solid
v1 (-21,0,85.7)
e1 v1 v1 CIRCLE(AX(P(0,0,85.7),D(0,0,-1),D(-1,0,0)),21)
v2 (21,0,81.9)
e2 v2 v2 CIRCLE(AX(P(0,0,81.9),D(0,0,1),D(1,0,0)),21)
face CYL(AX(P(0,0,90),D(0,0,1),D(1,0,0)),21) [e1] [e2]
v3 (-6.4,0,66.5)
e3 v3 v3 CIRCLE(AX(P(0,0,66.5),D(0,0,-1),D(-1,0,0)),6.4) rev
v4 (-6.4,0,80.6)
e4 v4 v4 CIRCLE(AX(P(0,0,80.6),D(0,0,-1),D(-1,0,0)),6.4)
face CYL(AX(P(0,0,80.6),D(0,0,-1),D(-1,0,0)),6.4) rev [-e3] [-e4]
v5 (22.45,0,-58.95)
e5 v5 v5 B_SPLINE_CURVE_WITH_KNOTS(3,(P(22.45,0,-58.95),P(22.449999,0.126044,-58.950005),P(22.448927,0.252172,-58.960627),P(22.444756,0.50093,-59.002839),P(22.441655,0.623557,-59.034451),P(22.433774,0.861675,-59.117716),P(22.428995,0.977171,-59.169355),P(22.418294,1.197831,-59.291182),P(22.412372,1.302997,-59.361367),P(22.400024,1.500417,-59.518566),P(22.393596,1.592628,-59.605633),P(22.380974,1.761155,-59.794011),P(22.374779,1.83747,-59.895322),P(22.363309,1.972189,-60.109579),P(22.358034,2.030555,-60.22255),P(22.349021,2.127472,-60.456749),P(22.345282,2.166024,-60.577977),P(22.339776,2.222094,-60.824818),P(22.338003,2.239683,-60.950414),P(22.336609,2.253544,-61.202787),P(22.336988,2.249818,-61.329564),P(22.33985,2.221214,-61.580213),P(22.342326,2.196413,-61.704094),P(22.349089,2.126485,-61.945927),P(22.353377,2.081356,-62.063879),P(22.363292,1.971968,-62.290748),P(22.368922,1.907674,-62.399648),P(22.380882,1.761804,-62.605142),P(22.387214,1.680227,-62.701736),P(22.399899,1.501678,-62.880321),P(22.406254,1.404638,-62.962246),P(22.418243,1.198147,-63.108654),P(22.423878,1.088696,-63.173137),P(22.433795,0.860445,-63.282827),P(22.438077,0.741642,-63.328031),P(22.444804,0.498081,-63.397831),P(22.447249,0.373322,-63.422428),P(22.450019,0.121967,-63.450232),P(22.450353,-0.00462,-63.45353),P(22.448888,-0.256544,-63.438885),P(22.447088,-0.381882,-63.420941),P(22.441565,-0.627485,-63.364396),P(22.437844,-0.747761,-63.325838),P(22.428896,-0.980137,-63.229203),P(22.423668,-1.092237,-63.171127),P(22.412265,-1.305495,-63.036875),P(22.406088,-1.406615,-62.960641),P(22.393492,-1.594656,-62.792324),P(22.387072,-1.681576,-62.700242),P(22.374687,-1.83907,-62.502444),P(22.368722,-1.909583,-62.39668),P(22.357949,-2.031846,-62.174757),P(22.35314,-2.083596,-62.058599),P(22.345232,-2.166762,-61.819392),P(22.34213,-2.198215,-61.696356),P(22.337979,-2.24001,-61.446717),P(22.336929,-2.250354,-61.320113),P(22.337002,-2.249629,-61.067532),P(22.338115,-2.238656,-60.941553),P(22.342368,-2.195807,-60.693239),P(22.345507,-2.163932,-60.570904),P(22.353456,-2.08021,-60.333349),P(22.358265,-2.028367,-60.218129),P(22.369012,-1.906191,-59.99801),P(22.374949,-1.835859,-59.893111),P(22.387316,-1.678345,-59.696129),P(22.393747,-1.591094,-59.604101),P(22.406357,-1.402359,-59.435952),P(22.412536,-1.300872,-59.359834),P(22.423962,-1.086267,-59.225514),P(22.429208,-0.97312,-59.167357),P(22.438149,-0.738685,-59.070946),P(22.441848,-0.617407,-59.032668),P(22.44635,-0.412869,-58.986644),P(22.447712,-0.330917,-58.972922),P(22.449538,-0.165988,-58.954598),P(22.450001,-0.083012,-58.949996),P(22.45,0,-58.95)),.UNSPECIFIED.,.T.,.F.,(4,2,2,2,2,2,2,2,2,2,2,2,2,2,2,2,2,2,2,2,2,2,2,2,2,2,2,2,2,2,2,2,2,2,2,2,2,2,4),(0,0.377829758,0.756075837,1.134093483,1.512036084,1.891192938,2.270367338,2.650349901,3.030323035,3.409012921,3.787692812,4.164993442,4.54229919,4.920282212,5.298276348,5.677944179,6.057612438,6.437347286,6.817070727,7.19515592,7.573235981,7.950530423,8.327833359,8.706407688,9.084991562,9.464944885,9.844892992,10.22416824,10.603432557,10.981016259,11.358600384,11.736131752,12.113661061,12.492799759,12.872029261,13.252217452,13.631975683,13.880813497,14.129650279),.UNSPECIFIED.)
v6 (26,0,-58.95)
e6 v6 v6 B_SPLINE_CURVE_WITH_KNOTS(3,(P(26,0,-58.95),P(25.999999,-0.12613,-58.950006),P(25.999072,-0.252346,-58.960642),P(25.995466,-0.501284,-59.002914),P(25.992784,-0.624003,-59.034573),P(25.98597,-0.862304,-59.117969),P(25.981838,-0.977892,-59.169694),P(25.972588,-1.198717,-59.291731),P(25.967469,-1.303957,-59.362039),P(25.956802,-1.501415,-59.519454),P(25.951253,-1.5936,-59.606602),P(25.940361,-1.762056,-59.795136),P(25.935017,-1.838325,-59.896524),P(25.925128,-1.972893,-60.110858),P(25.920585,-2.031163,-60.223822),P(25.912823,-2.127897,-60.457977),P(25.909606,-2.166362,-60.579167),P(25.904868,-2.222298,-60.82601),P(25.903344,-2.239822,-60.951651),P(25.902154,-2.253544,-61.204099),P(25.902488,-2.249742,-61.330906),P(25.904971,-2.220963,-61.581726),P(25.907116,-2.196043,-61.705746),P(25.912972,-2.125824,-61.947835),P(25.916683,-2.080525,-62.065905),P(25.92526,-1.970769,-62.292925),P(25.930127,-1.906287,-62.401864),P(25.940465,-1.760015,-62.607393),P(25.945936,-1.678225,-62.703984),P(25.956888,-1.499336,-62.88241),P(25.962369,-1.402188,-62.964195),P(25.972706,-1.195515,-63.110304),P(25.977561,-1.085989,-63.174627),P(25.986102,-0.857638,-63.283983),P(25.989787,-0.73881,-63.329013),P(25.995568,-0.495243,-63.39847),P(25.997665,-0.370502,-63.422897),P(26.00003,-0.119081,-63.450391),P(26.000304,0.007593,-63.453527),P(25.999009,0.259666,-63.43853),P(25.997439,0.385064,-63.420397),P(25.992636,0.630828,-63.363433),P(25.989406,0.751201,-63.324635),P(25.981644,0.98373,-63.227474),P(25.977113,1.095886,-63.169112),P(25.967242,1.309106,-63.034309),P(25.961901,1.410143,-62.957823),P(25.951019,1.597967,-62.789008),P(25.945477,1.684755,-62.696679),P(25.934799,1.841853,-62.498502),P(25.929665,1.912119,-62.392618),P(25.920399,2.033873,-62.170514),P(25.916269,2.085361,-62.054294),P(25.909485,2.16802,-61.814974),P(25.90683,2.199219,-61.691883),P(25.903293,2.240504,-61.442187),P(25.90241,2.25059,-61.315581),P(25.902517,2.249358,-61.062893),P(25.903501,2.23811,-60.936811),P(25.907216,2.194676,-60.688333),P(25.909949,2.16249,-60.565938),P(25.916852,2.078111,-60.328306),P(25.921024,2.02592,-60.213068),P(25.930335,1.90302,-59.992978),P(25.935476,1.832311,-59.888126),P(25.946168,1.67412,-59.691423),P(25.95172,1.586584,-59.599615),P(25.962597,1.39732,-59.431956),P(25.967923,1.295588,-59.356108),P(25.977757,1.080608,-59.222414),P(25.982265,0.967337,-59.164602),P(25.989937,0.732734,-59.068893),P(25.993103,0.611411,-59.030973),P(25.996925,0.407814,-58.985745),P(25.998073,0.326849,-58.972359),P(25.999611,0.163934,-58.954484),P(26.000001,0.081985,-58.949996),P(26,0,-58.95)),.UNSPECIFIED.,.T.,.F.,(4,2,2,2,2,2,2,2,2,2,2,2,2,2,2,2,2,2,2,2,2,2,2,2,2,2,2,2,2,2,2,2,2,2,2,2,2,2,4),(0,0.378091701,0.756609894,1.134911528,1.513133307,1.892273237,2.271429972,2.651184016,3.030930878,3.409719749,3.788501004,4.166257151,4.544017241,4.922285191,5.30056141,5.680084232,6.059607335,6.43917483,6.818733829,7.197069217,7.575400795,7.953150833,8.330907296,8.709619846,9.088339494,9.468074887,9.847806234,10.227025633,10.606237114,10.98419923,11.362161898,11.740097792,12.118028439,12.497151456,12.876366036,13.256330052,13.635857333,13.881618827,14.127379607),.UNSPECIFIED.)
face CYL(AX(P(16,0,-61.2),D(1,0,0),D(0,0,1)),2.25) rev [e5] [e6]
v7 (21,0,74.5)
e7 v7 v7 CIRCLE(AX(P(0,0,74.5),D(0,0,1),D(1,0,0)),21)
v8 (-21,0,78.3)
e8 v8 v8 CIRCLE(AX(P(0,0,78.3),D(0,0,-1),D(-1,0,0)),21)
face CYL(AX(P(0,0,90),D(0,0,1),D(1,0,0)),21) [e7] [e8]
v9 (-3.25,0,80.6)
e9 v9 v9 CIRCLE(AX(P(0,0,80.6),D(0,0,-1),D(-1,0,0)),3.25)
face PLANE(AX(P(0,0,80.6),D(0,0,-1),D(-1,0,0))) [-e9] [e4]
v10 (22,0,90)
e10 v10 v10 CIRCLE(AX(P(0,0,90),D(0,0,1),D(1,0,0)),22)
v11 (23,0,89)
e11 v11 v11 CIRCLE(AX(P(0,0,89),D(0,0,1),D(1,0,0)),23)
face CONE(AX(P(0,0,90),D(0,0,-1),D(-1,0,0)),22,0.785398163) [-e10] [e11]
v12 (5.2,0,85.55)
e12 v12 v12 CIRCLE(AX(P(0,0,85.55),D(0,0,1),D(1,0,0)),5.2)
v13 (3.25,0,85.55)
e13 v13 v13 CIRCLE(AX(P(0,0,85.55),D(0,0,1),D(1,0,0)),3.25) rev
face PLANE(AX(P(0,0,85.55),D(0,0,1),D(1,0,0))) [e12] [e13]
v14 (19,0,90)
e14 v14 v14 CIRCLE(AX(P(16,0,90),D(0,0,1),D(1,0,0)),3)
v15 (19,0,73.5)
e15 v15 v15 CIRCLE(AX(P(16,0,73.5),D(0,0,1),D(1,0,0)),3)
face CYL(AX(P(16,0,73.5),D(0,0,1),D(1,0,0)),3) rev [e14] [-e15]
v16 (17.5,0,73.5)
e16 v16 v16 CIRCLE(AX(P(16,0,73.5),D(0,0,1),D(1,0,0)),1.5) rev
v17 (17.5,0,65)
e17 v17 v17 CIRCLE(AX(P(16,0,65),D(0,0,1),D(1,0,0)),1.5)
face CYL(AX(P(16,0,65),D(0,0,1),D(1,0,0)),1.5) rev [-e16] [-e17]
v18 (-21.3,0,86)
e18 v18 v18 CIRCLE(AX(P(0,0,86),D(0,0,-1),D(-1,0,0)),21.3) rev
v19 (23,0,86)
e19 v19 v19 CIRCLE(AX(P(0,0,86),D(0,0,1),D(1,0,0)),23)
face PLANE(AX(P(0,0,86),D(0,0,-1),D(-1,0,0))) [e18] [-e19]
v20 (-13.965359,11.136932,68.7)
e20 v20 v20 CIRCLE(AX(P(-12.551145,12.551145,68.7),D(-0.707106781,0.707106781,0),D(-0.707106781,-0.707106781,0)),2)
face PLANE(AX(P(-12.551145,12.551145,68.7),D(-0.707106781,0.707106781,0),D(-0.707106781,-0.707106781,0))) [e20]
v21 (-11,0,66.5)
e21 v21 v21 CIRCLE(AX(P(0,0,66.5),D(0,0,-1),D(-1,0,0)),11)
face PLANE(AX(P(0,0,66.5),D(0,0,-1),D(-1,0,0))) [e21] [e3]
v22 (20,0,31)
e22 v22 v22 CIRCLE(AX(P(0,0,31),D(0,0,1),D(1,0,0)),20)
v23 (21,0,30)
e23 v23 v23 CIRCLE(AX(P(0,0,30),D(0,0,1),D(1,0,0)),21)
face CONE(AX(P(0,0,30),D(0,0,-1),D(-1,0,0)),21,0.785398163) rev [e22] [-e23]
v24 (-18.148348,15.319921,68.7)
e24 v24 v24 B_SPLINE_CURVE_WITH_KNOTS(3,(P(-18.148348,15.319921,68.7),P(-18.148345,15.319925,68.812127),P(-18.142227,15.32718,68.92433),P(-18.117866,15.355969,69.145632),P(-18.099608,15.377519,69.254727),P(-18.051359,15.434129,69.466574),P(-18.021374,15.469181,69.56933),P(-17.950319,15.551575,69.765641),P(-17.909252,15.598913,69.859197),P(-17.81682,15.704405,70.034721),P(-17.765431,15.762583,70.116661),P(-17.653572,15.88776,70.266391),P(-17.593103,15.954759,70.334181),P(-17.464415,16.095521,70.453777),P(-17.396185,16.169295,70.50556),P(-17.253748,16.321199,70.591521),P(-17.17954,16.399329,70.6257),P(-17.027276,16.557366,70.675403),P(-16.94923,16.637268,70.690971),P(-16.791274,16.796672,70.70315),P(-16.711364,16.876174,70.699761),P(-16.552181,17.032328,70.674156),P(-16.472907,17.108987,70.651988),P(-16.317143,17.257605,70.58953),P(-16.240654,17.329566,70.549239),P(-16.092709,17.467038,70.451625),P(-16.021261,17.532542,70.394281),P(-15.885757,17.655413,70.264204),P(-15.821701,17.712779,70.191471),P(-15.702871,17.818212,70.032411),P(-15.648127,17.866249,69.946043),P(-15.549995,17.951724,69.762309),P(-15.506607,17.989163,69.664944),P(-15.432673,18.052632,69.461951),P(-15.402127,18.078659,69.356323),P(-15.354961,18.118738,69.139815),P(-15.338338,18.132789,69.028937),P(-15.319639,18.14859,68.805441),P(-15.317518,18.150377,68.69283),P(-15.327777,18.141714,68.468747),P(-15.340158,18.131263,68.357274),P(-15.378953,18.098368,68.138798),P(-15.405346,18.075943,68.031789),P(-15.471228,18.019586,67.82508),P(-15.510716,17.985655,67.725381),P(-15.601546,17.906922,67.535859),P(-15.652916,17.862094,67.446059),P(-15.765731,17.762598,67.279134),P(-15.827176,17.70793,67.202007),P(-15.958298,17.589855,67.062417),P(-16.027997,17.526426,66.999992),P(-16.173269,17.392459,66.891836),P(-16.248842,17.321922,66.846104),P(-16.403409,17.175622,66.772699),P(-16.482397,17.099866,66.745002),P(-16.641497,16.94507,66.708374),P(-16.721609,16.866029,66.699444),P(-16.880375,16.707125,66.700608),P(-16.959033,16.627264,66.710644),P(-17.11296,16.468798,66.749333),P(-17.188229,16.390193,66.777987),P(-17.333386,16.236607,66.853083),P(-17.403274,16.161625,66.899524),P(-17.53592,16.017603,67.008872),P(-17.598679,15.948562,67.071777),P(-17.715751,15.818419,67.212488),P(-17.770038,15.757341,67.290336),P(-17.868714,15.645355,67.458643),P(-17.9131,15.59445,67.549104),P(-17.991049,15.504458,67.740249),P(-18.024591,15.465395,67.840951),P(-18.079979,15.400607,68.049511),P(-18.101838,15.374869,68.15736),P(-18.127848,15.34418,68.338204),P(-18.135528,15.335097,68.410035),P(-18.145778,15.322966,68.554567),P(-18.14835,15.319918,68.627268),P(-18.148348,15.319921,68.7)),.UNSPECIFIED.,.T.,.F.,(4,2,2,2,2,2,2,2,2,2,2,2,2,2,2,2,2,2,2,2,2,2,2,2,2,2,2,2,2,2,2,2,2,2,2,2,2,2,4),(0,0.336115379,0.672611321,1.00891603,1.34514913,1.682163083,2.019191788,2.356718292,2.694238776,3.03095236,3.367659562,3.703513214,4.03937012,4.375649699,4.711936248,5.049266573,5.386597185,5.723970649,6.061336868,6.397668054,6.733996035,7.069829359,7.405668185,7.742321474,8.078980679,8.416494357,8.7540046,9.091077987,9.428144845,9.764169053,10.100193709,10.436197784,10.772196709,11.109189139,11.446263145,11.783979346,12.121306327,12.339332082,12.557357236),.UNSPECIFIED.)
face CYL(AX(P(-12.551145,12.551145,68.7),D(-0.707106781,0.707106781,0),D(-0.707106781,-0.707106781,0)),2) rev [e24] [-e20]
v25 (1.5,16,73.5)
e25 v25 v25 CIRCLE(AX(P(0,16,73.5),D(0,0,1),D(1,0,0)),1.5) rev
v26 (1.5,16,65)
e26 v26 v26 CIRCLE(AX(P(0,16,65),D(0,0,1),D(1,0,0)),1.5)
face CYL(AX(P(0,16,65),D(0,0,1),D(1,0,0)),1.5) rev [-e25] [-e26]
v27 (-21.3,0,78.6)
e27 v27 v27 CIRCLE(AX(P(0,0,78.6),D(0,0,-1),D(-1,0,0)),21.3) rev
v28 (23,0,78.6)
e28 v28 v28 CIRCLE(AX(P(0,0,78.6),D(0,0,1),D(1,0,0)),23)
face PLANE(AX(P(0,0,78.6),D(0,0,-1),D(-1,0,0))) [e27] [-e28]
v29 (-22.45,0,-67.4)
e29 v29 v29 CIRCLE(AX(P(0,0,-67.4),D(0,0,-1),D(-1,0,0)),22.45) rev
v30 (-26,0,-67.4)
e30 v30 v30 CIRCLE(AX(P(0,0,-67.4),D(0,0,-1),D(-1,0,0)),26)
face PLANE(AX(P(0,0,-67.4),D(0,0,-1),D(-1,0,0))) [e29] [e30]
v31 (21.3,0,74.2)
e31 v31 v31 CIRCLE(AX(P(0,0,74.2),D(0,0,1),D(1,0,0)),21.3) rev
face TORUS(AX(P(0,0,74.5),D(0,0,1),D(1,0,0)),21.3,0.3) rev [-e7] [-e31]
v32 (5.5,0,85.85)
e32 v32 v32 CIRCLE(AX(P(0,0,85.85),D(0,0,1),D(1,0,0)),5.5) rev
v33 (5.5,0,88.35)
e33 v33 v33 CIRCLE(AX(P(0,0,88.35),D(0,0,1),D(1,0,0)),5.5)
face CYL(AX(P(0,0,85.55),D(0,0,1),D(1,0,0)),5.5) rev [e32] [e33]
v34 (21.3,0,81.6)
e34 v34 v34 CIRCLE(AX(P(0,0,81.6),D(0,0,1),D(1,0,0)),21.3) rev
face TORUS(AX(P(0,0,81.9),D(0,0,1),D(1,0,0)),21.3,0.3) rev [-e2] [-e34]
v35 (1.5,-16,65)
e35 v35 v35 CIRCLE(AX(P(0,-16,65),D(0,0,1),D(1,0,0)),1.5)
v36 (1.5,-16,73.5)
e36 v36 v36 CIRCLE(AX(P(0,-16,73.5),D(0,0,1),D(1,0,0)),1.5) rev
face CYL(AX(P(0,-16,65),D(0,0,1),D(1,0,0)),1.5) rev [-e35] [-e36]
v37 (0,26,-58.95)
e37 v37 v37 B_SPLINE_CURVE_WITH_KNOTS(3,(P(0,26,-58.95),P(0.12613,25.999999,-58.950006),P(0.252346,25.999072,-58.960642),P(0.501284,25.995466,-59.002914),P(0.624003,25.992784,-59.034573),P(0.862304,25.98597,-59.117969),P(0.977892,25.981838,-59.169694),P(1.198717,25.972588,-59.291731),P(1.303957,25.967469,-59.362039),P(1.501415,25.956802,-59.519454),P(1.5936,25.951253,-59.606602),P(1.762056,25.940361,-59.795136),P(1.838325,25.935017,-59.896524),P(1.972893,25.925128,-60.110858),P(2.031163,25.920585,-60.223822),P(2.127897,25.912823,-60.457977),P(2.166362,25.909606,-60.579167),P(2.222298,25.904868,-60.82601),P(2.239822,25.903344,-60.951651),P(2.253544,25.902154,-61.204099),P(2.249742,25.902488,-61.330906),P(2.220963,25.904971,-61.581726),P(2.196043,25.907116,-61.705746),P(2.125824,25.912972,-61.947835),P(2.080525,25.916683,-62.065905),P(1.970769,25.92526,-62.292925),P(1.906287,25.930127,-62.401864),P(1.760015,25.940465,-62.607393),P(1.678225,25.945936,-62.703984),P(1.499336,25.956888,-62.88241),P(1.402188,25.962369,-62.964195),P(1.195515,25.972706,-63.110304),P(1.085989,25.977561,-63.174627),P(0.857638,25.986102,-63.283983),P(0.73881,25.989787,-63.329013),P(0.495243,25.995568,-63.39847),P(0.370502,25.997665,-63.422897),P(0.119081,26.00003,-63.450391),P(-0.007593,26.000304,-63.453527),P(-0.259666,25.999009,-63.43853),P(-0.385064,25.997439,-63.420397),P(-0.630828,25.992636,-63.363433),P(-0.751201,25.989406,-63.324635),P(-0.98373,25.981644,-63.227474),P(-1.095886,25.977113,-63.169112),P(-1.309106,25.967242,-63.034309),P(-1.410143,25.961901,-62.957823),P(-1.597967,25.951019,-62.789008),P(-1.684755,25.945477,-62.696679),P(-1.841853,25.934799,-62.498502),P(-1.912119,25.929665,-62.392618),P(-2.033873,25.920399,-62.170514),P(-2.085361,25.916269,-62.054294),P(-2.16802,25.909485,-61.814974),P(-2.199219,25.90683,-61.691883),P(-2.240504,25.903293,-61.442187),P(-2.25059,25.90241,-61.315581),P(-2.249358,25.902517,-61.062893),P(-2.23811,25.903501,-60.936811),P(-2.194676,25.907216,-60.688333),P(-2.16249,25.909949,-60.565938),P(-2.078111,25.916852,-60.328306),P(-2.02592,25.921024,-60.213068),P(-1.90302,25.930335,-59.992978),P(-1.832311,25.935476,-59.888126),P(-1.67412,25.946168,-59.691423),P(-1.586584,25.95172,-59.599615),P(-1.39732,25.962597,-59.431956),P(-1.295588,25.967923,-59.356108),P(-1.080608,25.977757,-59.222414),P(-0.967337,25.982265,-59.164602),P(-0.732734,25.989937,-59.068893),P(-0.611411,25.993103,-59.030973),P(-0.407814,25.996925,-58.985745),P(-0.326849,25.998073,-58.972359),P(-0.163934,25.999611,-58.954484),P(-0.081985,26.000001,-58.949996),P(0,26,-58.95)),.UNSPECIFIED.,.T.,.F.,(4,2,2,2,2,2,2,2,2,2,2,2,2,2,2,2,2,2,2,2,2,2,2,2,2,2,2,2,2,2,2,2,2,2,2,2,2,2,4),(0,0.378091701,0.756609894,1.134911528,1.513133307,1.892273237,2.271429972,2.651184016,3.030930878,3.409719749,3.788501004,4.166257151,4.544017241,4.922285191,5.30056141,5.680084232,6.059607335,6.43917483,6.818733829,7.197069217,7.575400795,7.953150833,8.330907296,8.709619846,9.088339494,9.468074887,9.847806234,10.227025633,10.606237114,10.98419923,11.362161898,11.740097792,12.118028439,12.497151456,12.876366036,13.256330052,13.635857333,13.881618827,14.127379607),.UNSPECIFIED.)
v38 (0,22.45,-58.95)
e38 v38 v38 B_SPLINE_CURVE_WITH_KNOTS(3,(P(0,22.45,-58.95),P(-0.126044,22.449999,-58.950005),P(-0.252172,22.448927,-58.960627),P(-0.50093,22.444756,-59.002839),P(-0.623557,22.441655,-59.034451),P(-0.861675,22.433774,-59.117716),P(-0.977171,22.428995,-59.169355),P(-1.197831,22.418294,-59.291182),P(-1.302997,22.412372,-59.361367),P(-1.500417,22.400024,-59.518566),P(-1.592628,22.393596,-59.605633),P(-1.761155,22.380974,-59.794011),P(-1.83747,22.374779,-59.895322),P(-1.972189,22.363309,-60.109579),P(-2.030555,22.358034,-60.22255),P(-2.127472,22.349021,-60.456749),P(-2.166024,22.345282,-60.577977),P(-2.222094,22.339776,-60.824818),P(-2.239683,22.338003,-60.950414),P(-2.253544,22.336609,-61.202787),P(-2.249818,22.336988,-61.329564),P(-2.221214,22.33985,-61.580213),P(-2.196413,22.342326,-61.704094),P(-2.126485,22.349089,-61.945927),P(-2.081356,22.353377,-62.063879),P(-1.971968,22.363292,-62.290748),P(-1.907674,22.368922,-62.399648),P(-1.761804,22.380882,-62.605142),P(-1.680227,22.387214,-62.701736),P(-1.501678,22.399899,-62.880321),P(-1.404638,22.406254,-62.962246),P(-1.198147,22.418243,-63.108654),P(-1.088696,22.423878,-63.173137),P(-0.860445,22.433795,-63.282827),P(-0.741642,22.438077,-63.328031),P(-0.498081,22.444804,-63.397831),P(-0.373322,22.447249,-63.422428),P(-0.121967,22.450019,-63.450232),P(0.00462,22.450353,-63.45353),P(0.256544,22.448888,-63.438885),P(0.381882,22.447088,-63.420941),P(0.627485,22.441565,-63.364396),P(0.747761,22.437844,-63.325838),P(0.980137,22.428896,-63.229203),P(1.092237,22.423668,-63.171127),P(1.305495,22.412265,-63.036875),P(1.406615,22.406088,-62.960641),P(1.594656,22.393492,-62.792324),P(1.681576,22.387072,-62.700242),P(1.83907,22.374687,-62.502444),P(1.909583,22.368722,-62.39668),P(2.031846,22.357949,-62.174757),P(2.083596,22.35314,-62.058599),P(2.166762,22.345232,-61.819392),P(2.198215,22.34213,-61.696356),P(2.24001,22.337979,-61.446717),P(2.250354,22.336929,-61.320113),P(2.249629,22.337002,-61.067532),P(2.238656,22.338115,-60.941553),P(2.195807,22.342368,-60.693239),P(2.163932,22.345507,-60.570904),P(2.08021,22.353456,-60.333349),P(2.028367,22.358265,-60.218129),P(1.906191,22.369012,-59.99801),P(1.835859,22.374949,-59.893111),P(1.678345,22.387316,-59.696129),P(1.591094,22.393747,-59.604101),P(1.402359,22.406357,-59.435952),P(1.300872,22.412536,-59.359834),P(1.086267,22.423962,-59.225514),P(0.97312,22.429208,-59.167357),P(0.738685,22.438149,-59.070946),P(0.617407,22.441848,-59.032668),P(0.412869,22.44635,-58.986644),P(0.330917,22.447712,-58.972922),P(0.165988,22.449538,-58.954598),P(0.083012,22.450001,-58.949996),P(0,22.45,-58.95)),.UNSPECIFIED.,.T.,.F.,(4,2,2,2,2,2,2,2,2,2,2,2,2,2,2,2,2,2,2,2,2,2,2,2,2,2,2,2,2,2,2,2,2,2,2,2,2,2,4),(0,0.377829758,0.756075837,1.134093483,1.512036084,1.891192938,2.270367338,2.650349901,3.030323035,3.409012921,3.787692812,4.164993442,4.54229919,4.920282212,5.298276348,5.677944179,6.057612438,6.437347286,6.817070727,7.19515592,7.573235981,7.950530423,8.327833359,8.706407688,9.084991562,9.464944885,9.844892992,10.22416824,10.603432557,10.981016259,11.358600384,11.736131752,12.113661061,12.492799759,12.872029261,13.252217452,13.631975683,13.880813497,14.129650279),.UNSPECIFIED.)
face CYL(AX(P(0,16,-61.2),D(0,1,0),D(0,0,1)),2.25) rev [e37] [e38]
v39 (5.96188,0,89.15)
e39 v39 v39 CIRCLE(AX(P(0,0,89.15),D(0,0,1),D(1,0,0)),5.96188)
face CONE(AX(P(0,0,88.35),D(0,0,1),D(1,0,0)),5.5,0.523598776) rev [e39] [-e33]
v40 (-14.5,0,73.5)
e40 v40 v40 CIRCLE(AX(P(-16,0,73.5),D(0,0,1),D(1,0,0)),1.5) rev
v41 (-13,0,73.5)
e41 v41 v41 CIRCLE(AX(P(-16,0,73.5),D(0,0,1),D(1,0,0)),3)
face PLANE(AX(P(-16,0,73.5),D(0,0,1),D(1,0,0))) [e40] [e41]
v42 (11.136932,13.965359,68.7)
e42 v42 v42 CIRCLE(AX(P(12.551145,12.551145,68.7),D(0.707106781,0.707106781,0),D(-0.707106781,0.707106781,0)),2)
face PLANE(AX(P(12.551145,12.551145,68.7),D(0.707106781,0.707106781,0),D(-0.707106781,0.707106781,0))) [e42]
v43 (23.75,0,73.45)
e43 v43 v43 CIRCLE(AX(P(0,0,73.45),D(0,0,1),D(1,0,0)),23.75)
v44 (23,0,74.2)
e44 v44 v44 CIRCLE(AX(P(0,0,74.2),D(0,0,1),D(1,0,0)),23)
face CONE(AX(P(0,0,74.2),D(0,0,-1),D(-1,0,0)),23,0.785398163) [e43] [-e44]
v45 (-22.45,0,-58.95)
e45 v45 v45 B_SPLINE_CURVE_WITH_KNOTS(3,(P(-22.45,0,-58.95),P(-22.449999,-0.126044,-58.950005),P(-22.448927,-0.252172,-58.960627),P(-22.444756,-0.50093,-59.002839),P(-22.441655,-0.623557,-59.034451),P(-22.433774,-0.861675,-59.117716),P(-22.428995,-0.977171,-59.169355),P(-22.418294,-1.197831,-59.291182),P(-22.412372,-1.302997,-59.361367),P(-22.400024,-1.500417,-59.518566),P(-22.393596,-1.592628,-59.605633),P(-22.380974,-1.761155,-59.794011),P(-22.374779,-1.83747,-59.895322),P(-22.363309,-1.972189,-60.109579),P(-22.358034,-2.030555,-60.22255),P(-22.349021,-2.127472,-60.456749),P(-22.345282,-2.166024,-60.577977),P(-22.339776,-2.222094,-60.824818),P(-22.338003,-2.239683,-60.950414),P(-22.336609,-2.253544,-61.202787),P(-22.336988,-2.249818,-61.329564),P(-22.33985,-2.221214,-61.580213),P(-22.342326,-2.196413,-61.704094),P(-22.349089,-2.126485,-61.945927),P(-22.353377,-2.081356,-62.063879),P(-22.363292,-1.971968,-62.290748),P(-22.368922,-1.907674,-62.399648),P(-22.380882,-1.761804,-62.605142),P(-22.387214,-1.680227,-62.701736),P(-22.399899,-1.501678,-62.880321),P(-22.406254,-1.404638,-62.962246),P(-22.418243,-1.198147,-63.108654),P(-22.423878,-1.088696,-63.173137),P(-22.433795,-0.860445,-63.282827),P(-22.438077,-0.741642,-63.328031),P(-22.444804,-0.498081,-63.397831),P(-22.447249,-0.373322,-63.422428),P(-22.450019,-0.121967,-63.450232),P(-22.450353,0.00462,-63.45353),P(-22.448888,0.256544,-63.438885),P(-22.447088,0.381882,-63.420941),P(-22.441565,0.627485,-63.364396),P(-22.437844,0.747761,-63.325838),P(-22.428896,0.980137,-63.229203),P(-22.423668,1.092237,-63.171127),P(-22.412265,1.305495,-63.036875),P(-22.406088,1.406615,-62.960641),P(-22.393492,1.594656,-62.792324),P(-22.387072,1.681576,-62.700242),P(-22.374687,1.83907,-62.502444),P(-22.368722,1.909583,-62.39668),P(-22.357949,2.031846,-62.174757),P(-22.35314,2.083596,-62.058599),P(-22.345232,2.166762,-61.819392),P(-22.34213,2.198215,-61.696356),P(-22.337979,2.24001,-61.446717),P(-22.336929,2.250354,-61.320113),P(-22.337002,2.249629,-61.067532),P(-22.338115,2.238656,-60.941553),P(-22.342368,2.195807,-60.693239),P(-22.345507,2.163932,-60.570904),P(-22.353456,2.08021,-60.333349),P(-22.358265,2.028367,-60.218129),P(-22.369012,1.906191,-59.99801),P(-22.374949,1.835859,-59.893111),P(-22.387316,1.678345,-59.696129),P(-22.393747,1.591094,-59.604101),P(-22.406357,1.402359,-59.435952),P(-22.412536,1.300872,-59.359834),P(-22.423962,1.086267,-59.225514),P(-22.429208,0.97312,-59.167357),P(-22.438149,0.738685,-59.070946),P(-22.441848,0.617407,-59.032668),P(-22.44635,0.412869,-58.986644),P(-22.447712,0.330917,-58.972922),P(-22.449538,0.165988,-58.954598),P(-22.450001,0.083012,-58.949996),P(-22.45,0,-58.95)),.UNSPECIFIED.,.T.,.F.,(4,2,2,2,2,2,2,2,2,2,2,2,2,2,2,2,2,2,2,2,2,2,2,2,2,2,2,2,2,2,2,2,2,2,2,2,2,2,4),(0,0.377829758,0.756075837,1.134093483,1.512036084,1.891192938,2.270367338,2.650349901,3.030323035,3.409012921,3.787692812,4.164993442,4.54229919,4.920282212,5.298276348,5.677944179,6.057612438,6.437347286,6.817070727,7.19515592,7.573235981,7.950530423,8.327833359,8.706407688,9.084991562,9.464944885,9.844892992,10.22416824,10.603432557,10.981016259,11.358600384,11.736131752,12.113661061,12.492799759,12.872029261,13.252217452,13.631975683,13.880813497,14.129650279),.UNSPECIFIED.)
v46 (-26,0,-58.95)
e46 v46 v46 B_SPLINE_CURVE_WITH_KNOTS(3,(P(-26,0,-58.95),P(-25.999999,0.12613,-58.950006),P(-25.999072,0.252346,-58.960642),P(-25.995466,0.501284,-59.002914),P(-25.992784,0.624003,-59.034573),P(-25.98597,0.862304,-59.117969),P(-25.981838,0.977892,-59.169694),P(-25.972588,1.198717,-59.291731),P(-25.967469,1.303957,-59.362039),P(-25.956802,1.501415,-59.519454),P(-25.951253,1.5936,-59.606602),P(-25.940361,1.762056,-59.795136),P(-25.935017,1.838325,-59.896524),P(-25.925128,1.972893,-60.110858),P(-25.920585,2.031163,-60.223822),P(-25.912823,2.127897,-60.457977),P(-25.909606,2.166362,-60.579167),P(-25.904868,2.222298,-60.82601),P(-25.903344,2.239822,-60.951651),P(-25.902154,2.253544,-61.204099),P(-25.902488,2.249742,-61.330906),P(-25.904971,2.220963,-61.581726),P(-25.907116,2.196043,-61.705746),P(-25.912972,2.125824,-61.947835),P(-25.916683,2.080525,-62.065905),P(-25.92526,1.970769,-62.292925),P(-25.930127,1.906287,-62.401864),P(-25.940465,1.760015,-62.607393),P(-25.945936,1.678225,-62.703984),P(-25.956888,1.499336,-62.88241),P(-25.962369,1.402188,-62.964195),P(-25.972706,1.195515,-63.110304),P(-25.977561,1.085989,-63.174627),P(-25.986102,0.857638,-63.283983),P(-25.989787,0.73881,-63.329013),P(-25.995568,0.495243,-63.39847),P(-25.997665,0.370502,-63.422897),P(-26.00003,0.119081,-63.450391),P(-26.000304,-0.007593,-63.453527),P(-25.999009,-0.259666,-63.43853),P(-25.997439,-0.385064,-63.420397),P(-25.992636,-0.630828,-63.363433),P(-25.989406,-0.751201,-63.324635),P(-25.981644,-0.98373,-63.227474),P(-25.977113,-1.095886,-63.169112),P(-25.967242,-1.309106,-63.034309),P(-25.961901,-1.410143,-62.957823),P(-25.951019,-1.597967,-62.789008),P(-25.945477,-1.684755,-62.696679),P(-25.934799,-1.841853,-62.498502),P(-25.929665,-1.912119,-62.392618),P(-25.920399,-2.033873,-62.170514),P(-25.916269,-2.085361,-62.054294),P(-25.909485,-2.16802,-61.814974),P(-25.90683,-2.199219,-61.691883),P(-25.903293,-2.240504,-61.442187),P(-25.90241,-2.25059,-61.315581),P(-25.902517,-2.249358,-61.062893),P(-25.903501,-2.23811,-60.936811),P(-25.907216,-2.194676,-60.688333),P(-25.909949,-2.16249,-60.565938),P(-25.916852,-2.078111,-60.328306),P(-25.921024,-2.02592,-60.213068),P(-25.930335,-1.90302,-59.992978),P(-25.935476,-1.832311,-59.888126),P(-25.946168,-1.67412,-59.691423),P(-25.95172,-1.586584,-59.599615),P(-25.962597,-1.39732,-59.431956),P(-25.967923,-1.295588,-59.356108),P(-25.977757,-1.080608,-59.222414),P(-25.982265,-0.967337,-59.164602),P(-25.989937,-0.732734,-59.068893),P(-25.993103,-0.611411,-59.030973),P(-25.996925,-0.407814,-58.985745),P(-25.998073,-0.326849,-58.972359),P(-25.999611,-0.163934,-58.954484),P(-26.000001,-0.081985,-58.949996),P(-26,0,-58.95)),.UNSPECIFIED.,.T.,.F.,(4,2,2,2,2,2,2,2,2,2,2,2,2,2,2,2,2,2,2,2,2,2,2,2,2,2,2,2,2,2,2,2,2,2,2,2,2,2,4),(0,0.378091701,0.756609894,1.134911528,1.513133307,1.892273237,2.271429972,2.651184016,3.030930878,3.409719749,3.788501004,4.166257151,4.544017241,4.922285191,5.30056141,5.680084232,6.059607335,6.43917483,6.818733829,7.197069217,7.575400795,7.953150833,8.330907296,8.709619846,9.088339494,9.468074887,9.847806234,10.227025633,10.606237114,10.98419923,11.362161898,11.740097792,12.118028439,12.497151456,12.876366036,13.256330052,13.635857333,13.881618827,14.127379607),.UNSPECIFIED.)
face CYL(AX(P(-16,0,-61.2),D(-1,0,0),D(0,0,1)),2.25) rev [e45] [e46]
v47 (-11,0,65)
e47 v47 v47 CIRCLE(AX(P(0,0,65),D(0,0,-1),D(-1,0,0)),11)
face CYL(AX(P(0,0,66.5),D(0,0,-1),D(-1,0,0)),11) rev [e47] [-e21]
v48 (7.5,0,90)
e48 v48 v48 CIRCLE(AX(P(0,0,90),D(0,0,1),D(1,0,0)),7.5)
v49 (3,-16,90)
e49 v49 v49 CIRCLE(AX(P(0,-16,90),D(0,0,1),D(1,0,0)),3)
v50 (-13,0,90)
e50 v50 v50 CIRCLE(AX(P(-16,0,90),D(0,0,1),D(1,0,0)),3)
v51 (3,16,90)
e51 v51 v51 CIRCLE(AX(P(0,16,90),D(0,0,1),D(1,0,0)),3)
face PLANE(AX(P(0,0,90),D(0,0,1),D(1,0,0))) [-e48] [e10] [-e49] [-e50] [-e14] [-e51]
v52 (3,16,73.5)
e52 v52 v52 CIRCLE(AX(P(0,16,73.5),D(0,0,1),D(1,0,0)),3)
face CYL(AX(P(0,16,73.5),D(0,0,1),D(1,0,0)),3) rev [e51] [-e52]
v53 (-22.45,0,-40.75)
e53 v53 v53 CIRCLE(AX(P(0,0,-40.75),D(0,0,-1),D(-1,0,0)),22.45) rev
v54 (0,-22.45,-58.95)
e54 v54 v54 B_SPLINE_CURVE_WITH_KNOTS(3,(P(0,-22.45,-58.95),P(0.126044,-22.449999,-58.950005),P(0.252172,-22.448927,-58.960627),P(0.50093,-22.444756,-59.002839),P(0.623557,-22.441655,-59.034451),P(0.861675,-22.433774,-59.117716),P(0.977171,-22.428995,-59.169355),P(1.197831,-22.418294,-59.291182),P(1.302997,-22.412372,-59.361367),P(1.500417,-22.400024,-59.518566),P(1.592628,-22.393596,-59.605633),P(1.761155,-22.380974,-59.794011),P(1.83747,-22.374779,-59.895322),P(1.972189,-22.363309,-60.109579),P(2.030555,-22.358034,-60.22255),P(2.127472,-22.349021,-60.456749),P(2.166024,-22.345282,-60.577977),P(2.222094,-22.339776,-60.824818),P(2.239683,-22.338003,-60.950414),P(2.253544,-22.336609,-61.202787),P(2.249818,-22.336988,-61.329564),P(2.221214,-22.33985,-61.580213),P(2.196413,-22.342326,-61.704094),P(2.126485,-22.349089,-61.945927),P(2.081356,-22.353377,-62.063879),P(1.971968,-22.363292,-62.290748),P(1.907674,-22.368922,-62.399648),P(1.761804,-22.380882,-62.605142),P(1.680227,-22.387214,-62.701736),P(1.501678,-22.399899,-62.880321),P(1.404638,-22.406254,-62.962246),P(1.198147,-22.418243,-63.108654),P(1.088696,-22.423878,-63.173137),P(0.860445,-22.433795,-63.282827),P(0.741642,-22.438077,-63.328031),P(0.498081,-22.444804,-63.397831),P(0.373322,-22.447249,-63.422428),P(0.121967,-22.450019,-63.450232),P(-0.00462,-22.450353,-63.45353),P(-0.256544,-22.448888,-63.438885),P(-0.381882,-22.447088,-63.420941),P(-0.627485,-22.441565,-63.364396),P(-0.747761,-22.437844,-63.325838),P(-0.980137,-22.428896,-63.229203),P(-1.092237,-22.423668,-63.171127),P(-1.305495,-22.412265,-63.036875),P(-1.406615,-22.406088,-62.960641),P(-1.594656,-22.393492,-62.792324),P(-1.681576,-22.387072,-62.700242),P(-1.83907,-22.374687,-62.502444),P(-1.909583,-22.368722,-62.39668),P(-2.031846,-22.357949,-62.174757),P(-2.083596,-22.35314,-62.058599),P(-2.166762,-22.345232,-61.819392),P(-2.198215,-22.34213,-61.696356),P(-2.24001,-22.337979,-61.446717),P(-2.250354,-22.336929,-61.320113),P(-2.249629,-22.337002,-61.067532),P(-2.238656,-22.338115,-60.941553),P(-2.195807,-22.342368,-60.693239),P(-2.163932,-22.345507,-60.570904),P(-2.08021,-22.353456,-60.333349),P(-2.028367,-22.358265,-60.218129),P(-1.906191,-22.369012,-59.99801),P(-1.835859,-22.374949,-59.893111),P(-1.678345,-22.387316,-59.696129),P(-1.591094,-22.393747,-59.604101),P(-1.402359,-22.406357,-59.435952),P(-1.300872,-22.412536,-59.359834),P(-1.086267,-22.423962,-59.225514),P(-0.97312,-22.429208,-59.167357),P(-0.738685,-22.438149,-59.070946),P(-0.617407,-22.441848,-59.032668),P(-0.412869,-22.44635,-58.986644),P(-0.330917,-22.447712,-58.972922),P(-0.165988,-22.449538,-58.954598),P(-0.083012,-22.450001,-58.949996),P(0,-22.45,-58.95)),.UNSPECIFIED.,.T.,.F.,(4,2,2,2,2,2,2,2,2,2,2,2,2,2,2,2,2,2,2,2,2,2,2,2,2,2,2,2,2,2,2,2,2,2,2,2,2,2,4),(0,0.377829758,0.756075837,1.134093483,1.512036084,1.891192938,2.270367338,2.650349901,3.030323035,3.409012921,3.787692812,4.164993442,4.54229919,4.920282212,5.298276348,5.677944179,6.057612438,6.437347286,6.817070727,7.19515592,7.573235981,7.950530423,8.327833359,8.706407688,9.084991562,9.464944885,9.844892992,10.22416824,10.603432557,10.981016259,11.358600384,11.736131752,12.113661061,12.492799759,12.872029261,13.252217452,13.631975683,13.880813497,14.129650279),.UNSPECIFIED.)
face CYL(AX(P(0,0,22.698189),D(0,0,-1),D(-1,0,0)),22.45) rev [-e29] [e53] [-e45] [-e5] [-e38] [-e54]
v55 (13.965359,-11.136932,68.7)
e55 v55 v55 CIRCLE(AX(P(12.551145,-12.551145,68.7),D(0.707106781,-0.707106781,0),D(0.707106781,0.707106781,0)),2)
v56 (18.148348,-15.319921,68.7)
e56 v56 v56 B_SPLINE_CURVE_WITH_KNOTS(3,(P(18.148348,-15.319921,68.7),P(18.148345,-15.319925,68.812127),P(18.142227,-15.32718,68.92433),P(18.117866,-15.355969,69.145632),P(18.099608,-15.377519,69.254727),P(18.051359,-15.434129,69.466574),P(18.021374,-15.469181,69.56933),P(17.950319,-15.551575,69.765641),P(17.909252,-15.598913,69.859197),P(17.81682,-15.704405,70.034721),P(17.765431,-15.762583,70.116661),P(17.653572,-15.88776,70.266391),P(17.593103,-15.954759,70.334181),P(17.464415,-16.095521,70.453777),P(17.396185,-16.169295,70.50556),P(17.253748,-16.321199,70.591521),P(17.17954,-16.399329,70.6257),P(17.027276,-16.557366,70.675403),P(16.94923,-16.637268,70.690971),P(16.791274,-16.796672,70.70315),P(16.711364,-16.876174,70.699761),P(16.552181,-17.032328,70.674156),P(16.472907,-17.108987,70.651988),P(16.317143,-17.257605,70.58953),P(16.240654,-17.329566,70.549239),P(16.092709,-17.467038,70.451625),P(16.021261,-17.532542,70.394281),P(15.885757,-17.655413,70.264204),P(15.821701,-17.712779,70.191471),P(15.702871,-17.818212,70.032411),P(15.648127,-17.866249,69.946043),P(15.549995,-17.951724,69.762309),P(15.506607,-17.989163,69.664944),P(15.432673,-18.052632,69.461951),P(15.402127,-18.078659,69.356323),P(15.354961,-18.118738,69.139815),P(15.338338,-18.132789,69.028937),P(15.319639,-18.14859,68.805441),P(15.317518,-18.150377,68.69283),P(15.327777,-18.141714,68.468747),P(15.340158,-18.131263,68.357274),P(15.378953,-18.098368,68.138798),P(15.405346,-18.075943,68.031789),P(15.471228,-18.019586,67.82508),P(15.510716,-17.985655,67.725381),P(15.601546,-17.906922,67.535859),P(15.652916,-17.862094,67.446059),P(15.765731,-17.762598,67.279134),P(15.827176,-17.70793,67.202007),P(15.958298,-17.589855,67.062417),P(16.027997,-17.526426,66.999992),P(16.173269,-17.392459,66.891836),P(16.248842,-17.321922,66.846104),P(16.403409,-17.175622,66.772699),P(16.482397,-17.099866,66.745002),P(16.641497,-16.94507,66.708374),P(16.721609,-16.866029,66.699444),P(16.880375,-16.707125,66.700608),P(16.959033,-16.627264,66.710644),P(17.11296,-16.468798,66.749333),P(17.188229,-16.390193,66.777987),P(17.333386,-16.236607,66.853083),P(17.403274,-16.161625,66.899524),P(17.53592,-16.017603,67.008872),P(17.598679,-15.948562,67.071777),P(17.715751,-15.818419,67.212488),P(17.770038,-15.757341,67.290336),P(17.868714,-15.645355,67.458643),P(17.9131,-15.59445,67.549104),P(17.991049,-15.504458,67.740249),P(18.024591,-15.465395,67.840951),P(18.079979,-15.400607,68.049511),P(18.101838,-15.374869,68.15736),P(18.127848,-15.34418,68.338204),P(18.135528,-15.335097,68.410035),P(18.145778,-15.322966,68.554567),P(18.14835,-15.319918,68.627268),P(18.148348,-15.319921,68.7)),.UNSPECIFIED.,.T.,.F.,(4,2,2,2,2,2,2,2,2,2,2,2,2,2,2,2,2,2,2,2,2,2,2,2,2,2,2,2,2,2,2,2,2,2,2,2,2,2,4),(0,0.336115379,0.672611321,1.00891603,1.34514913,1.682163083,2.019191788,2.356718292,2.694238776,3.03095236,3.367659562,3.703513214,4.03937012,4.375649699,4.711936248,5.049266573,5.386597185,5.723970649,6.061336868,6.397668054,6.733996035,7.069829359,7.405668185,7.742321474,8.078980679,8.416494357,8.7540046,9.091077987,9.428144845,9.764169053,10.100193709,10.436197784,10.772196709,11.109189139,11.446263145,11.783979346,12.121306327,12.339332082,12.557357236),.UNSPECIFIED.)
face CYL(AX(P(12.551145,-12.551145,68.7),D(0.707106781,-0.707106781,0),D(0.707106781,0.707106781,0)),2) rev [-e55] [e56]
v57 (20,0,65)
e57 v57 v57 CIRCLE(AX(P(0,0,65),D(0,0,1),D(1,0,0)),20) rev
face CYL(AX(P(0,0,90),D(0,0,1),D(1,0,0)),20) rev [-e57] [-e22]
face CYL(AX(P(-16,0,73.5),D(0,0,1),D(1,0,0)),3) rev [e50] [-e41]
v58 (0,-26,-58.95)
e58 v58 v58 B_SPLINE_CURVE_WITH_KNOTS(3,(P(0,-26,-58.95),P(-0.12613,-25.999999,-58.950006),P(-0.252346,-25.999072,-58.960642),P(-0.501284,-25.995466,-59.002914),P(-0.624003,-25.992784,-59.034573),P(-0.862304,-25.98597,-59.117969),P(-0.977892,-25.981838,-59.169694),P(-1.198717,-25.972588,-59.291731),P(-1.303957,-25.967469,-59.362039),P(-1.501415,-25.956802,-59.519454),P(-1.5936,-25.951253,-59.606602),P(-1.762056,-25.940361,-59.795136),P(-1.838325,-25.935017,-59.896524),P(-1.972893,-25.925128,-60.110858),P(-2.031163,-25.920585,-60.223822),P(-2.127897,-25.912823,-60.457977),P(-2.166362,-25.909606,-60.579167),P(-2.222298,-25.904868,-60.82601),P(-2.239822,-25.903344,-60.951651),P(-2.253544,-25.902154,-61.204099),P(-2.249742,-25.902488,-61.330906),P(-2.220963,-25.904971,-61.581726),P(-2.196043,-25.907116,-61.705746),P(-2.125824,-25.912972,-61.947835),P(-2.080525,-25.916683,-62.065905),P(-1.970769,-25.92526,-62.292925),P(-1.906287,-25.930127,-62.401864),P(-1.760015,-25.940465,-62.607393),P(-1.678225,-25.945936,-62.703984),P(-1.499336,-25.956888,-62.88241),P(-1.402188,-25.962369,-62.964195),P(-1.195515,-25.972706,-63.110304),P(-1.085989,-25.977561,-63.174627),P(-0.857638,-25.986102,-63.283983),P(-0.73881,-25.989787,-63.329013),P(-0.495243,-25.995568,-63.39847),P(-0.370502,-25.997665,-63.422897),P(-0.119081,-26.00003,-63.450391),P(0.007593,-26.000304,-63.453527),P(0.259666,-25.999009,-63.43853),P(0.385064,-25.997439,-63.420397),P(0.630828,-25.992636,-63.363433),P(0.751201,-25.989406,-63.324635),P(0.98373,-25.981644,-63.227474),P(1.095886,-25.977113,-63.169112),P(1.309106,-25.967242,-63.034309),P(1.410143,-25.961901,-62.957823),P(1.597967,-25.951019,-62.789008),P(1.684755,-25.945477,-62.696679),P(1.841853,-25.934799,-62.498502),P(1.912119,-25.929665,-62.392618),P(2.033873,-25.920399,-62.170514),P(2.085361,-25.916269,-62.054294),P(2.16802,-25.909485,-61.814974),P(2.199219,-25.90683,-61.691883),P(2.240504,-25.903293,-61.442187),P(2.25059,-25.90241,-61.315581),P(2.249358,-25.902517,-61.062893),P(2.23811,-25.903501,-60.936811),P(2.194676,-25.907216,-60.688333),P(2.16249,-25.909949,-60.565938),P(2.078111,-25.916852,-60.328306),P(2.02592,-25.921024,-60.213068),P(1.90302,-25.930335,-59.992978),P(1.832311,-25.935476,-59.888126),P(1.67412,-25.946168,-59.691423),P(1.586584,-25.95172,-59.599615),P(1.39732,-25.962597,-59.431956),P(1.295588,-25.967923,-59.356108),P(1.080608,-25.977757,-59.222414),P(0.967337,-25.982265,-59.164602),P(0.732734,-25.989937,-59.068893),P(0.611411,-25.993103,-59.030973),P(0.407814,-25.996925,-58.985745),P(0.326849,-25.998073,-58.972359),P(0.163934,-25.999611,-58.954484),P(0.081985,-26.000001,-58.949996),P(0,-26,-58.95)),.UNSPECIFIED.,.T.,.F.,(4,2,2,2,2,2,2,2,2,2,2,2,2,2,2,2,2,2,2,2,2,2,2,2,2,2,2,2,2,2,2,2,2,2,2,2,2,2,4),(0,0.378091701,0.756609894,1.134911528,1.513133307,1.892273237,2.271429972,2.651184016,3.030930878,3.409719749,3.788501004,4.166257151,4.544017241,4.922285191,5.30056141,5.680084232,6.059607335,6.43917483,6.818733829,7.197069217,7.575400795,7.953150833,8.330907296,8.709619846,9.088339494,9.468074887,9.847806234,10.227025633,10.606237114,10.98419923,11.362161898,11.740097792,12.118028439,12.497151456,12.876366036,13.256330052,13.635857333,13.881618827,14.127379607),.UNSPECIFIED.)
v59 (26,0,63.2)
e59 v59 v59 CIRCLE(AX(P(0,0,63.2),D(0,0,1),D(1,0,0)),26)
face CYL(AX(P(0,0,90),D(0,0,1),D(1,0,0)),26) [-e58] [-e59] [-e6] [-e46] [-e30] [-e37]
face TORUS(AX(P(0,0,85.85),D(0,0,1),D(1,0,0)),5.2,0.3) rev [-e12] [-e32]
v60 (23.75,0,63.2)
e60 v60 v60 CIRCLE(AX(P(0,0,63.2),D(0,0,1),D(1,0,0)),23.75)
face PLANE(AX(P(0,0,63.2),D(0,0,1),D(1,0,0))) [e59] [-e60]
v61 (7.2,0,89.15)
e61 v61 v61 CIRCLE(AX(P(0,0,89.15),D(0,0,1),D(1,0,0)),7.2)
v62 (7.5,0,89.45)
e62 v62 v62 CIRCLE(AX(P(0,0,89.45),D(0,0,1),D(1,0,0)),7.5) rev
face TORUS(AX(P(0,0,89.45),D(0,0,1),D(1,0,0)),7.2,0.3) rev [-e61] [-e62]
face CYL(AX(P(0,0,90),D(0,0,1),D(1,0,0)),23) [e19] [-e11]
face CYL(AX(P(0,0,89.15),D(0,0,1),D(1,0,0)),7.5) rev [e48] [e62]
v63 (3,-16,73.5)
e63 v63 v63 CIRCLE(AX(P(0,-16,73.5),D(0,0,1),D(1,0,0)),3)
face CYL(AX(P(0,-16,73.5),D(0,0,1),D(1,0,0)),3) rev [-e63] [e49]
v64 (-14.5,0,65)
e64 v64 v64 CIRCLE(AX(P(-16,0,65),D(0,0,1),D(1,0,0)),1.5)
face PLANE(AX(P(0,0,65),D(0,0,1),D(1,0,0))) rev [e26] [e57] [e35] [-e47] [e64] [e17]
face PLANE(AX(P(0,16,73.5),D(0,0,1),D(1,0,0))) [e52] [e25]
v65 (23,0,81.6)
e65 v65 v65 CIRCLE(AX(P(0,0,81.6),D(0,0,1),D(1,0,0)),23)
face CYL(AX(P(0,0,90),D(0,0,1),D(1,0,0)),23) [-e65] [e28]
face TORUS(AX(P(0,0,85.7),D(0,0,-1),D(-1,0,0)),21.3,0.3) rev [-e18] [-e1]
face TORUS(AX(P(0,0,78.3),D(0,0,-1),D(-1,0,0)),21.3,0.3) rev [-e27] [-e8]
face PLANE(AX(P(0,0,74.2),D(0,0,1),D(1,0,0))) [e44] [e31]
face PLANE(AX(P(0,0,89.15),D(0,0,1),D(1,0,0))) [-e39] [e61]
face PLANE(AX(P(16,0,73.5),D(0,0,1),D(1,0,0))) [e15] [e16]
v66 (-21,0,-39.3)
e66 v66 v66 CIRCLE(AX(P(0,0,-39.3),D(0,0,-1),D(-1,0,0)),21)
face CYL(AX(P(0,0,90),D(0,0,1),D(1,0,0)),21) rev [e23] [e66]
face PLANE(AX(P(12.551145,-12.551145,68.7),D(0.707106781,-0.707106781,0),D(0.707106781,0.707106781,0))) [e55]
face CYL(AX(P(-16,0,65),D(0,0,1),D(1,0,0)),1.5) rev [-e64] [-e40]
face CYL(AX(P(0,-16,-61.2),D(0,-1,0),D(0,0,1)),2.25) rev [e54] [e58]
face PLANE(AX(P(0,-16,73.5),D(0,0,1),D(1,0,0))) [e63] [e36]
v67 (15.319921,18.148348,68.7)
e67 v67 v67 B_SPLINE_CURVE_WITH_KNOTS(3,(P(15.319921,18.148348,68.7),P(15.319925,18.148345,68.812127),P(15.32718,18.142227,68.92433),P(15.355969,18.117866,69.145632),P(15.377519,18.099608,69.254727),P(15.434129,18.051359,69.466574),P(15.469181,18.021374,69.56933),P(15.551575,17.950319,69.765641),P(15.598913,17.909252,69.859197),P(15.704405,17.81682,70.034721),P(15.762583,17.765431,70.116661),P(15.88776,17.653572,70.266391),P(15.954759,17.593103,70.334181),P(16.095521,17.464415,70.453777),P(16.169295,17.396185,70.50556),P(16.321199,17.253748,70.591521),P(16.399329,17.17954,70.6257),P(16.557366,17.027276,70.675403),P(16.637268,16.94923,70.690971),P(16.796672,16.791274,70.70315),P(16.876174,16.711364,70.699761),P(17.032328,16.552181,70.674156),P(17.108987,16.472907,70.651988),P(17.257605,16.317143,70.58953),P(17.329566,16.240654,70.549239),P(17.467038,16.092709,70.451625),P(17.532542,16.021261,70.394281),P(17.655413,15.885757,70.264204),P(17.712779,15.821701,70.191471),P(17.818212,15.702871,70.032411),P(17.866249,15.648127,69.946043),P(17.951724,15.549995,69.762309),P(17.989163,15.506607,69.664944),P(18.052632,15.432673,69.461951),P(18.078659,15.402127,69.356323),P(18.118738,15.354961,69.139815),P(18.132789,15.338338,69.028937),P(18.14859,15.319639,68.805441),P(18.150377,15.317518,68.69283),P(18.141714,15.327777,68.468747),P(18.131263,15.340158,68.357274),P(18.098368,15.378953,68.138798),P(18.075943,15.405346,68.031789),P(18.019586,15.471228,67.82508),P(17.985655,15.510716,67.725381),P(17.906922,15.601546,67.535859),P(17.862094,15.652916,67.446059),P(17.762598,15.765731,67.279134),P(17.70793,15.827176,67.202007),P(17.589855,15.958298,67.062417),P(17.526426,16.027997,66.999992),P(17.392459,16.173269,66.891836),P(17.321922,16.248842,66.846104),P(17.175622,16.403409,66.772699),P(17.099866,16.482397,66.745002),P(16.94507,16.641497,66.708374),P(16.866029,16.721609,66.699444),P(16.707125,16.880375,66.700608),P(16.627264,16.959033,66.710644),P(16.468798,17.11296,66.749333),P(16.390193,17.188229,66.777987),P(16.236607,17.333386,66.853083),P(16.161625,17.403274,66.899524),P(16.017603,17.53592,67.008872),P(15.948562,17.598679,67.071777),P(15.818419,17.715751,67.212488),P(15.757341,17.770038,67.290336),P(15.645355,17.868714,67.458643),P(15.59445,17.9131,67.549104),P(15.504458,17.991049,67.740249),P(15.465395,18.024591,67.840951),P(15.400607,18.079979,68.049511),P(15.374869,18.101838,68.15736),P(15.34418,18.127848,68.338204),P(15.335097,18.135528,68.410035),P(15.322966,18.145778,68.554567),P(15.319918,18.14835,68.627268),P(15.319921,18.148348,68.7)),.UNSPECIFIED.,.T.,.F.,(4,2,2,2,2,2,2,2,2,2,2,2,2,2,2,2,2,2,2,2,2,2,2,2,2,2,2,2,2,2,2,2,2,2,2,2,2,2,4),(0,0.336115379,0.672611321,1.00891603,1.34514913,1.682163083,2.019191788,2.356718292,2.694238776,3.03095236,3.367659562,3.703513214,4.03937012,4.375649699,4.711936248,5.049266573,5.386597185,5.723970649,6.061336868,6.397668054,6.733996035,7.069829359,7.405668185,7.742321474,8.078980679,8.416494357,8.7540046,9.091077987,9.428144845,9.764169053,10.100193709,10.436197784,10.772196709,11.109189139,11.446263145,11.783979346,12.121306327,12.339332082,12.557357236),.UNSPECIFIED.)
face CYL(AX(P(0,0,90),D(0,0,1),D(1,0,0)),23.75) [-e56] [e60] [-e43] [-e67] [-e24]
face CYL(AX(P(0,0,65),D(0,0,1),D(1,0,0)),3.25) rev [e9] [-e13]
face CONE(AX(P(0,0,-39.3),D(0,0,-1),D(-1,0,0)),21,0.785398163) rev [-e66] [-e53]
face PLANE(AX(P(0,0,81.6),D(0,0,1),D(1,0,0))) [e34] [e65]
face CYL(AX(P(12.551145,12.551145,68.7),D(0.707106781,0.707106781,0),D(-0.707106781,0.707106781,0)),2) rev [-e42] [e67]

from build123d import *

# Parameters (mm, degrees)
BOSS_EXTRUDE2_START = -25
SKETCH18_R          = 20
SKETCH18_R_2        = 1.5
BOSS_EXTRUDE2_DEPTH = 25
SKETCH35_R          = 6.4
CUT_EXTRUDE11_DEPTH = 15.6
SKETCH25_R          = 3
CUT_EXTRUDE3_DEPTH  = 16.5
SKETCH23_R          = 11
CUT_EXTRUDE2_DEPTH  = 1.5
SKETCH24_R          = 3.25
CUT_EXTRUDE12_DEPTH = 25
SKETCH26_R          = 26
SKETCH26_R_2        = 21
BOSS_EXTRUDE4_DEPTH = 67.6
CUT_EXTRUDE4_START  = -26.8
SKETCH27_R          = 22.25
SKETCH27_R_2        = 21
CUT_EXTRUDE4_DEPTH  = 26.8
SKETCH32_R          = 2
CUT_EXTRUDE8_DEPTH  = 6
CIRPATTERN2_COUNT   = 3
CIRPATTERN2_ANGLE   = 180
SKETCH38_R          = 2.25
CUT_EXTRUDE14_DEPTH = 10
CIRPATTERN3_COUNT   = 4
SKETCH39_R          = 5.5
CUT_EXTRUDE15_DEPTH = 4.45
SKETCH40_R          = 7.5
CUT_EXTRUDE16_DEPTH = 0.85
SKETCH45_R          = 22.45
CUT_EXTRUDE20_DEPTH = 26.8
CUT_EXTRUDE21_START = -0.2
SKETCH46_R          = 26
CUT_EXTRUDE21_DEPTH = 0.2
CHAMFER4_SIZE       = 1.5
FILLET1_R           = 0.3
FILLET2_R           = 0.3


with BuildPart() as part:
    # Sketch8 → Revolve1 (revolve)
    with BuildSketch(Plane(origin=(0, 0, 0), x_dir=(0, 0, -1), z_dir=(1, 0, 0)), mode=Mode.PRIVATE) as revolve1_sk:
        Polygon((-90, 20), (-31, 20), (-30, 21), (0, 21), (0, 26), (-63.2, 26), (-63.2, 23.75), (-73.45, 23.75), (-74.2, 23), (-74.2, 21), (-78.6, 21), (-78.6, 23), (-81.6, 23), (-81.6, 21), (-86, 21), (-86, 23), (-89, 23), (-90, 22), align=None)
    revolve(revolve1_sk.sketch.rotate(Axis((0, 0, 90), (0, 0, -1)), 90), axis=Axis((0, 0, 90), (0, 0, -1)))

    # Sketch18 → Boss-Extrude2 (add)
    with BuildSketch(Plane.XY.offset(90).offset(BOSS_EXTRUDE2_START)):
        Circle(SKETCH18_R)
        with Locations((0, 16)):
            Circle(SKETCH18_R_2, mode=Mode.SUBTRACT)
        with Locations((16, 0)):
            Circle(SKETCH18_R_2, mode=Mode.SUBTRACT)
        with Locations((0, -16)):
            Circle(SKETCH18_R_2, mode=Mode.SUBTRACT)
        with Locations((-16, 0)):
            Circle(SKETCH18_R_2, mode=Mode.SUBTRACT)
    extrude(amount=BOSS_EXTRUDE2_DEPTH)

    # Sketch35 → Cut-Extrude11 (cut)
    with BuildSketch(Plane(origin=(0, 0, 65), x_dir=(-1, 0, 0), z_dir=(0, 0, -1))):
        Circle(SKETCH35_R)
    extrude(amount=-CUT_EXTRUDE11_DEPTH, mode=Mode.SUBTRACT)

    # Sketch25 → Cut-Extrude3 (cut)
    with BuildSketch(Plane.XY.offset(90)):
        with Locations((0, 16)):
            Circle(SKETCH25_R)
        with Locations((16, 0)):
            Circle(SKETCH25_R)
        with Locations((0, -16)):
            Circle(SKETCH25_R)
        with Locations((-16, 0)):
            Circle(SKETCH25_R)
    extrude(amount=-CUT_EXTRUDE3_DEPTH, mode=Mode.SUBTRACT)

    # Sketch23 → Cut-Extrude2 (cut)
    with BuildSketch(Plane(origin=(0, 0, 65), x_dir=(-1, 0, 0), z_dir=(0, 0, -1))):
        Circle(SKETCH23_R)
    extrude(amount=-CUT_EXTRUDE2_DEPTH, mode=Mode.SUBTRACT)

    # Sketch24 → Cut-Extrude12 (cut)
    with BuildSketch(Plane.XY.offset(90)):
        Circle(SKETCH24_R)
    extrude(amount=-CUT_EXTRUDE12_DEPTH, mode=Mode.SUBTRACT)

    # Sketch26 → Boss-Extrude4 (add)
    with BuildSketch(Plane(origin=(0, 0, 0), x_dir=(-1, 0, 0), z_dir=(0, 0, -1))):
        with Locations(Location((0, 0, 0), (0, 0, 180))):
            Circle(SKETCH26_R)
        with Locations(Location((0, 0, 0), (0, 0, 180))):
            Circle(SKETCH26_R_2, mode=Mode.SUBTRACT)
    extrude(amount=BOSS_EXTRUDE4_DEPTH)

    # Sketch27 → Cut-Extrude4 (cut)
    with BuildSketch(Plane(origin=(0, 0, -67.6), x_dir=(-1, 0, 0), z_dir=(0, 0, -1)).offset(CUT_EXTRUDE4_START)):
        Circle(SKETCH27_R)
        with Locations(Location((0, 0, 0), (0, 0, 180))):
            Circle(SKETCH27_R_2, mode=Mode.SUBTRACT)
    extrude(amount=CUT_EXTRUDE4_DEPTH, mode=Mode.SUBTRACT)

    # Sketch32 → Cut-Extrude8 (cut)
    with BuildSketch(Plane(origin=(-16.793786053, 16.793786053, 0), x_dir=(0, 0, 1), z_dir=(-0.7071067811865487, 0.7071067811865465, 0))):
        with Locations(Location((68.7, 0, 0), (0, 0, 270))):
            Circle(SKETCH32_R)
    cut_extrude8 = extrude(amount=-CUT_EXTRUDE8_DEPTH, mode=Mode.SUBTRACT)

    # CirPattern2: Cut-Extrude8 ×3 about axis
    cirpattern2_axis = Axis((0, 0, 0), (0, 0, -1))
    for i in range(1, CIRPATTERN2_COUNT):
        add(cut_extrude8.rotate(cirpattern2_axis, i * CIRPATTERN2_ANGLE / (CIRPATTERN2_COUNT - 1)), mode=Mode.SUBTRACT)

    # Sketch38 → Cut-Extrude14 (cut)
    with BuildSketch(Plane(origin=(0, 26, 0), x_dir=(1, 0, 0), z_dir=(0, 1, 0))):
        with Locations(Location((0, 61.2, 0), (0, 0, 270))):
            Circle(SKETCH38_R)
    cut_extrude14 = extrude(amount=-CUT_EXTRUDE14_DEPTH, mode=Mode.SUBTRACT)

    # CirPattern3: Cut-Extrude14 ×4 about axis
    cirpattern3_axis = Axis((0, 0, -67.6), (0, 0, -1))
    for i in range(1, CIRPATTERN3_COUNT):
        add(cut_extrude14.rotate(cirpattern3_axis, i * 360 / CIRPATTERN3_COUNT), mode=Mode.SUBTRACT)

    # Sketch39 → Cut-Extrude15 (cut)
    with BuildSketch(Plane.XY.offset(90)):
        Circle(SKETCH39_R)
    extrude(amount=-CUT_EXTRUDE15_DEPTH, mode=Mode.SUBTRACT)

    # Sketch40 → Cut-Extrude16 (cut)
    with BuildSketch(Plane.XY.offset(90)):
        Circle(SKETCH40_R)
    extrude(amount=-CUT_EXTRUDE16_DEPTH, mode=Mode.SUBTRACT)

    # Sketch45 → Cut-Extrude20 (cut)
    with BuildSketch(Plane(origin=(0, 0, -67.6), x_dir=(-1, 0, 0), z_dir=(0, 0, -1))):
        Circle(SKETCH45_R)
    extrude(amount=-CUT_EXTRUDE20_DEPTH, mode=Mode.SUBTRACT)

    # Sketch46 → Cut-Extrude21 (cut)
    with BuildSketch(Plane(origin=(0, 0, -67.6), x_dir=(-1, 0, 0), z_dir=(0, 0, -1)).offset(CUT_EXTRUDE21_START)):
        with Locations(Location((0, 0, 0), (0, 0, 180))):
            Circle(SKETCH46_R)
    extrude(amount=CUT_EXTRUDE21_DEPTH, mode=Mode.SUBTRACT)

    # Chamfer4
    # the kernel refuses this chamfer: 1.5 mm, written as the material it takes off along each edge
    with BuildSketch(Plane(origin=(0, 0, -40.8), x_dir=(1, 0, 0), z_dir=(0, 1, 0))) as chamfer4_piece_1_section:
        Polygon((21, -CHAMFER4_SIZE), (21 + CHAMFER4_SIZE, 0), (21, 0), align=None)
    chamfer4_piece_1 = revolve(axis=Axis((0, 0, -40.8), (0, 0, -1)), mode=Mode.PRIVATE)
    chamfer4_piece_1 = chamfer4_piece_1 & Plane(origin=(0, 0, -40.042668068), x_dir=(-1, 0, 0), z_dir=(0, 0, -1)) * Cylinder(22.45, 90, mode=Mode.PRIVATE)
    add(chamfer4_piece_1, mode=Mode.SUBTRACT)

    # Fillet1
    fillet1_edges = [part.edges().sort_by_distance(p)[0] for p in [
        (-21, 0, 86),
        (-21, 0, 81.6),
        (-21, 0, 78.6),
        (-21, 0, 74.2),
    ]]
    fillet(fillet1_edges, radius=FILLET1_R)

    # Sketch47 → Cut-Revolve1 (revolve, cut)
    with BuildSketch(Plane(origin=(0, 0, 0), x_dir=(0, 0, -1), z_dir=(1, 0, 0)), mode=Mode.PRIVATE) as cut_revolve1_sk:
        Polygon((-89.15, 5.961880215), (-89.15, 5.5), (-88.35, 5.5), align=None)
    revolve(cut_revolve1_sk.sketch.rotate(Axis((0, 0, 90), (0, 0, -1)), 270), axis=Axis((0, 0, 90), (0, 0, -1)), mode=Mode.SUBTRACT)

    # Fillet2
    fillet2_edges = [part.edges().sort_by_distance(p)[0] for p in [
        (-5.5, 0, 85.55),
        (-7.5, 0, 89.15),
    ]]
    fillet(fillet2_edges, radius=FILLET2_R)


solid = part.part
